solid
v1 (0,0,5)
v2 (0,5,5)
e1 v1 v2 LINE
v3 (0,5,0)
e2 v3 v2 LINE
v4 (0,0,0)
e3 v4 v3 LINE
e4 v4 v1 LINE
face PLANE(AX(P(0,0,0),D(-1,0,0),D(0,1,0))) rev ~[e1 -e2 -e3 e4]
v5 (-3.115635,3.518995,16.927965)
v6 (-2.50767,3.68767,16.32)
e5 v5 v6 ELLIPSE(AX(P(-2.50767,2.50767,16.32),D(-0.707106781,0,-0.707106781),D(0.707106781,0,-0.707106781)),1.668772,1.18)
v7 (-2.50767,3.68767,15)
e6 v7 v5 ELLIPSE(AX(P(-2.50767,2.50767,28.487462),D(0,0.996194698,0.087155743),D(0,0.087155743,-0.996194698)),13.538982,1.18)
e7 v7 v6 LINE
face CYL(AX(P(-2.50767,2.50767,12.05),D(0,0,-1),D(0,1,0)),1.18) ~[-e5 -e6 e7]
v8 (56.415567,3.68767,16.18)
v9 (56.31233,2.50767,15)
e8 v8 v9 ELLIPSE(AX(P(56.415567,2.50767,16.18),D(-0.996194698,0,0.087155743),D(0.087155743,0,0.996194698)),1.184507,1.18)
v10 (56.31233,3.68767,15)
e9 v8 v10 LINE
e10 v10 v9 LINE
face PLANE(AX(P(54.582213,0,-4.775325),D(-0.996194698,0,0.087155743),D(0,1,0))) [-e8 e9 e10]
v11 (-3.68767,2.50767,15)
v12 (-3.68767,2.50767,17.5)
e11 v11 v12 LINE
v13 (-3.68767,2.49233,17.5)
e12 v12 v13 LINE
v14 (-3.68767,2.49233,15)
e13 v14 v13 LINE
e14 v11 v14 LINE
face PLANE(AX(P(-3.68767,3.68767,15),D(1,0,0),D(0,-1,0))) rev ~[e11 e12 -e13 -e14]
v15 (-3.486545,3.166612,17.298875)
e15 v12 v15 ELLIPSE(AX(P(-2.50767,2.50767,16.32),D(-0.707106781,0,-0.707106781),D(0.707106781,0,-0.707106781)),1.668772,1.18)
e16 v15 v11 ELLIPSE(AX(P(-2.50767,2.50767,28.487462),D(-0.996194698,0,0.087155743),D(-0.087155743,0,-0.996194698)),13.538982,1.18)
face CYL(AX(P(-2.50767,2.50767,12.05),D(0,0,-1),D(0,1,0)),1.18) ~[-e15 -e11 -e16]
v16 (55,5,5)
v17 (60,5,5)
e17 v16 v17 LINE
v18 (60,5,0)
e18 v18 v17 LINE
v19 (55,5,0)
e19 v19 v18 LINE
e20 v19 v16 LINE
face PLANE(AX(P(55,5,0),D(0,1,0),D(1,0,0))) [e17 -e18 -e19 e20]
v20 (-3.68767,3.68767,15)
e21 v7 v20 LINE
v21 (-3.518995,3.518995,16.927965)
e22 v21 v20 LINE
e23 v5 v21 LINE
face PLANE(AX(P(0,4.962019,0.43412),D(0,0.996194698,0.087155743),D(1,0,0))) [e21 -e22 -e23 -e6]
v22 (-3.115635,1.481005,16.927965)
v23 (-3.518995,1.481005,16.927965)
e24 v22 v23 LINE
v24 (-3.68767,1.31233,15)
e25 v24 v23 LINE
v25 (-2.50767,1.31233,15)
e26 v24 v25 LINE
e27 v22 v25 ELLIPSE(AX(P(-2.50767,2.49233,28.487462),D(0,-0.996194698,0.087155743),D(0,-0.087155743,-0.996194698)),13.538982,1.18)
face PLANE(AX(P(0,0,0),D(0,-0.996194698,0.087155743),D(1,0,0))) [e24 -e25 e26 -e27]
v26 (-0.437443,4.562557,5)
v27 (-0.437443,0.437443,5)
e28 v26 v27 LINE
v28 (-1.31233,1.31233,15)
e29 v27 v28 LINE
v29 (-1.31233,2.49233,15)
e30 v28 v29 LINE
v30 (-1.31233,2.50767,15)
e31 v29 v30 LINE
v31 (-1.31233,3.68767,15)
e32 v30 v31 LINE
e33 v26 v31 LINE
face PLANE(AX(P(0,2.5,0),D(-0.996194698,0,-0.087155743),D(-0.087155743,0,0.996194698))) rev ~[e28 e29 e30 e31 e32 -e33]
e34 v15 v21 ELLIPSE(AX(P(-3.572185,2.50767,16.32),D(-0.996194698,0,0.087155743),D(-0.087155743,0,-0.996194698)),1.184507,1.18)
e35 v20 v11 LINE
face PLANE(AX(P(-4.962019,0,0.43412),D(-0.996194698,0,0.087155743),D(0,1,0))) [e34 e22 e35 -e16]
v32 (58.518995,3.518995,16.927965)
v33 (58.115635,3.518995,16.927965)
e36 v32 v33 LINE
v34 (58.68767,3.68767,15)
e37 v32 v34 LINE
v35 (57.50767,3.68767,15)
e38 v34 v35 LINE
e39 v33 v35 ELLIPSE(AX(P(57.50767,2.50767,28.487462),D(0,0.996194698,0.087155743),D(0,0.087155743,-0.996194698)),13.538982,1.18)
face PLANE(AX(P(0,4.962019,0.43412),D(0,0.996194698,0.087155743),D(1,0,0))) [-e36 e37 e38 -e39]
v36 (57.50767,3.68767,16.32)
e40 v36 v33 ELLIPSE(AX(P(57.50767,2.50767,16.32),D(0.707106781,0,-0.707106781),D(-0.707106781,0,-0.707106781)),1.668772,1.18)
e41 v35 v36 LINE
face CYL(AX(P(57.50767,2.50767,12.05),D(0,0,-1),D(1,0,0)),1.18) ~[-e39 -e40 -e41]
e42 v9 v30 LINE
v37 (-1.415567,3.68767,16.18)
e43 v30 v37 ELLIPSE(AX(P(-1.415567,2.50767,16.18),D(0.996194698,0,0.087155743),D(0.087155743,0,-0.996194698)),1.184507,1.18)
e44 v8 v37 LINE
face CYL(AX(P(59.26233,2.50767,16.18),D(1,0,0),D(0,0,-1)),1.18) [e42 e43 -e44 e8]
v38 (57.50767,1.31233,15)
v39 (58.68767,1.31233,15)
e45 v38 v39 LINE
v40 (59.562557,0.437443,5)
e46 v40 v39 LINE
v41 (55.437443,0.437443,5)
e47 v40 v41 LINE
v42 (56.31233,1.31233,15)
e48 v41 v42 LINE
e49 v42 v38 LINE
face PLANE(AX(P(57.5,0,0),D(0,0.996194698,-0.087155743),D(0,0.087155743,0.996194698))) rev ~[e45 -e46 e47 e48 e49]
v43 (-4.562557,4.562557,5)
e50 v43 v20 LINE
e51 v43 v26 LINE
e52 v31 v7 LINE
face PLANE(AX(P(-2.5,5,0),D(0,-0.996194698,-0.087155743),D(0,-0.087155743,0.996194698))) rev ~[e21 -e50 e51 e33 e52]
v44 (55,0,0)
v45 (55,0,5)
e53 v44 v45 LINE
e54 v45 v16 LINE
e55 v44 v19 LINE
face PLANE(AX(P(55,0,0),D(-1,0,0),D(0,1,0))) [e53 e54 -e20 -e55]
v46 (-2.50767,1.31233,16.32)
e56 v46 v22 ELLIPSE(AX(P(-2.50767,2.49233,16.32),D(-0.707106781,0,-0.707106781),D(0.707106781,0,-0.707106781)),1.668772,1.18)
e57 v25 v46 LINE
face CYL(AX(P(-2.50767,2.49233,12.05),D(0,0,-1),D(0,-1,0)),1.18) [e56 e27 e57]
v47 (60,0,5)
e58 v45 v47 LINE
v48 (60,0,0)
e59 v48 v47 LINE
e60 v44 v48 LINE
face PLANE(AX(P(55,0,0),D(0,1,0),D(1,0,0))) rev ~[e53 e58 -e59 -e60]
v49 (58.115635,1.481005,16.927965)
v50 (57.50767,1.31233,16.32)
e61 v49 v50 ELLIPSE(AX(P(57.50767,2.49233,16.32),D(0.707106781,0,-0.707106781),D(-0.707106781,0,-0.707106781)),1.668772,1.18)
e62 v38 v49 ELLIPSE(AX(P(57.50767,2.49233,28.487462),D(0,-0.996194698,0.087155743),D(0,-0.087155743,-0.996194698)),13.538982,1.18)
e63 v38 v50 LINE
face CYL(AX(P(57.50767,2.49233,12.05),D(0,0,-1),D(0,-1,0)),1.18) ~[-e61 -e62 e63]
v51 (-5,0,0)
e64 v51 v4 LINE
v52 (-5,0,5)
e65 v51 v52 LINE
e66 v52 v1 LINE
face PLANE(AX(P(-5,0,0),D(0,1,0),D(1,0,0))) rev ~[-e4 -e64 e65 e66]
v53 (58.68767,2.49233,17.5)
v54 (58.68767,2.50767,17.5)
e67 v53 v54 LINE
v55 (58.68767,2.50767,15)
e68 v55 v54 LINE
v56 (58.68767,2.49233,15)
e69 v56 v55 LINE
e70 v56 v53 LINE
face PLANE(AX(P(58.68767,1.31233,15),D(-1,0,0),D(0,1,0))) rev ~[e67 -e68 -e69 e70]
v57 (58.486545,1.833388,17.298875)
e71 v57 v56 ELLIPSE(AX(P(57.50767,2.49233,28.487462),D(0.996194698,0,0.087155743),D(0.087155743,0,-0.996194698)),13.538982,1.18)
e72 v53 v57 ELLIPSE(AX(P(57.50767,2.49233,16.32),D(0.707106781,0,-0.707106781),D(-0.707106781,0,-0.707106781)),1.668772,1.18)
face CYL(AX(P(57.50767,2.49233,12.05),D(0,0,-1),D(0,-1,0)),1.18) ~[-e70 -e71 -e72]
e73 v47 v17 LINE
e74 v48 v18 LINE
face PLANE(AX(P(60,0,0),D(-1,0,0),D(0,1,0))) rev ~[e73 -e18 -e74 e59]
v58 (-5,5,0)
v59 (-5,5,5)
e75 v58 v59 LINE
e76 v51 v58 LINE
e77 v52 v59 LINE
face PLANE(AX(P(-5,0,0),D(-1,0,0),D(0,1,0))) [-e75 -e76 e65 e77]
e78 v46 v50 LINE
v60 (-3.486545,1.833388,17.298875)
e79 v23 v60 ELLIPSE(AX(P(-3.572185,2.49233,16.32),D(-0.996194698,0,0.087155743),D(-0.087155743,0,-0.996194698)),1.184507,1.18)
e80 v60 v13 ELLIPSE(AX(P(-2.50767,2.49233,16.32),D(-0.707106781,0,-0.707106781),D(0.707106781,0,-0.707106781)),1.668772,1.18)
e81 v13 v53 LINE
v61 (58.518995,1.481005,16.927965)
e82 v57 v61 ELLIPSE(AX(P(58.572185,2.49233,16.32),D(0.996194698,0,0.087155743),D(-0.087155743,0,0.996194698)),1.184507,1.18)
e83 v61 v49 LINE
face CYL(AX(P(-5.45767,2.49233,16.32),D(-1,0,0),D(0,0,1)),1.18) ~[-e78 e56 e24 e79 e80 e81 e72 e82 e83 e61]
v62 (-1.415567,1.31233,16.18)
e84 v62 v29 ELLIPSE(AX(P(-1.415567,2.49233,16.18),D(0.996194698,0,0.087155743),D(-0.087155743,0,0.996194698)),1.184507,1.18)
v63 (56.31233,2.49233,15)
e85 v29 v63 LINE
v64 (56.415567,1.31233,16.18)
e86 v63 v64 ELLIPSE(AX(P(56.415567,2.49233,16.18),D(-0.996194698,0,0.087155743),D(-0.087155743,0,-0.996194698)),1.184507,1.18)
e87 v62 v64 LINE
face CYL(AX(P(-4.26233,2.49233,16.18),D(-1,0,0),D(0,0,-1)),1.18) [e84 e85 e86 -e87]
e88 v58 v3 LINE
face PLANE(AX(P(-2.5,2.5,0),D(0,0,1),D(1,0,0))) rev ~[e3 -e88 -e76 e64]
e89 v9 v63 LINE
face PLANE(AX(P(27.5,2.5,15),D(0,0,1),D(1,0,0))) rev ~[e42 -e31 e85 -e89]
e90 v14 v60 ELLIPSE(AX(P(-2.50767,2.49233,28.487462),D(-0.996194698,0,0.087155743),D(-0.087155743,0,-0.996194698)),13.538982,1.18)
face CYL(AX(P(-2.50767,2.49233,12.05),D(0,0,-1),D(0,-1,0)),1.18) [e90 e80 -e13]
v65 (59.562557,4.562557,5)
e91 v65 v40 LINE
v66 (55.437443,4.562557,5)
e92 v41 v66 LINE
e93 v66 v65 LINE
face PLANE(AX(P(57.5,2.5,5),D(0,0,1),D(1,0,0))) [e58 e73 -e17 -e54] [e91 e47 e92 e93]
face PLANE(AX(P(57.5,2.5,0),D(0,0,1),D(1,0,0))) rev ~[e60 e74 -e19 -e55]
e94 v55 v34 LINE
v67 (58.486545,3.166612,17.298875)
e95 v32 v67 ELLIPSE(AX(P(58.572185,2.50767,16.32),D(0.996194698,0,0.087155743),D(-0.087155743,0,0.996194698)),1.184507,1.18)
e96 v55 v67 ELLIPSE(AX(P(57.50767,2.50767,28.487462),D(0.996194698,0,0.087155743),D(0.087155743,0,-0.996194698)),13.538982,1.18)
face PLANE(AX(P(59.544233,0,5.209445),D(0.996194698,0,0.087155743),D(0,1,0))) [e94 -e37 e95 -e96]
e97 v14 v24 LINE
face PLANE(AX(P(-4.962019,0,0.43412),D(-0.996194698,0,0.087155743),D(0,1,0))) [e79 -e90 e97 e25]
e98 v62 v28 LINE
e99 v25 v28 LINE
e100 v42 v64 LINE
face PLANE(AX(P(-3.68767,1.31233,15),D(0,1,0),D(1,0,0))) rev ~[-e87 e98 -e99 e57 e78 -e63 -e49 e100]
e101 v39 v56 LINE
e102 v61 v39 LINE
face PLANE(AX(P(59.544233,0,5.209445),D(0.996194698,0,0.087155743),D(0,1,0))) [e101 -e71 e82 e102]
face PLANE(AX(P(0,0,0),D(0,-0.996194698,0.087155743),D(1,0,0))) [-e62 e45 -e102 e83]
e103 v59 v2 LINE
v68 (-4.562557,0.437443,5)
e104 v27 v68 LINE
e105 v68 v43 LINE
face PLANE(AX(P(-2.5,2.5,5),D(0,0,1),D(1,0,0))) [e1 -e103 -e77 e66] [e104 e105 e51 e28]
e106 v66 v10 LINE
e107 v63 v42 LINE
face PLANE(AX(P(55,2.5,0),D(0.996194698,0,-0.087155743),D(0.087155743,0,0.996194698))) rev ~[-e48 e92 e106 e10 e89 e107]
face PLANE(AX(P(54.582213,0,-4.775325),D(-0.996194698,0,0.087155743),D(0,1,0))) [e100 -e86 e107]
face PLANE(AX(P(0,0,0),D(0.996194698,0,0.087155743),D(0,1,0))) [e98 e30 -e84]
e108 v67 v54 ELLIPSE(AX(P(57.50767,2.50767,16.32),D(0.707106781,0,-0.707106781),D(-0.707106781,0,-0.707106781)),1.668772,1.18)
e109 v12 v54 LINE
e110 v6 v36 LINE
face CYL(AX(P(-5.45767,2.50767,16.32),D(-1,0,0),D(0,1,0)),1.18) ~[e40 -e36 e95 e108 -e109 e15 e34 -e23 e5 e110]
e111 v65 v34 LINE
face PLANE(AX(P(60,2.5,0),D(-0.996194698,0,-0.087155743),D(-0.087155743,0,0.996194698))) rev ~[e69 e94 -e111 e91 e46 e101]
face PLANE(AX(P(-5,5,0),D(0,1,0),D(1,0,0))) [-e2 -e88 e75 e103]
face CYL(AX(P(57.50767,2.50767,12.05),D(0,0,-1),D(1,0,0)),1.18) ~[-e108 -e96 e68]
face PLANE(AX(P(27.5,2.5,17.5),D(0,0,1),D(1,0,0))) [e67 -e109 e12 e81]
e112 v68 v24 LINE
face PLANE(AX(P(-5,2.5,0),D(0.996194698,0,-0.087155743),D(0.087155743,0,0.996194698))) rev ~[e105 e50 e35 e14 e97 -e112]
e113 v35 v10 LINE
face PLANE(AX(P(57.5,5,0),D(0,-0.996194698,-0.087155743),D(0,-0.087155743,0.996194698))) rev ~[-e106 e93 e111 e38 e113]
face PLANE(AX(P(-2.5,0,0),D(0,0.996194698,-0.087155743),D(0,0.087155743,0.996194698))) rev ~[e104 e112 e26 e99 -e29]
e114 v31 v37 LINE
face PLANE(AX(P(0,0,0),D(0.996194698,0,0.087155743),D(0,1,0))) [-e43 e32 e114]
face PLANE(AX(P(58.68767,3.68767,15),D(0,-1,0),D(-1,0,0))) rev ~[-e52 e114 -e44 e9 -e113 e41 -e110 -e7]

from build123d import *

# Parameters (mm, degrees)
F0_W         = 5
F0_H         = 5
F1_DEPTH     = 5
F2_DEPTH     = 15
F2_TAPER     = 5
F4_DEPTH     = 2.5
F5_T4_DEPTH  = 8.4
F5_T9_DEPTH  = 8.4
F5_T14_DEPTH = 8.4
F5_T19_DEPTH = 8.4
F5_T24_DEPTH = 8.4
F5_T29_DEPTH = 8.4
F5_T34_DEPTH = 8.4
F5_T39_DEPTH = 8.4
F6_T1_DEPTH  = 65.9153400942
F6_T6_DEPTH  = 63.5246599058
F6_T12_DEPTH = 63.5246599058


# Not quite as in the source:
# - a fillet or chamfer that OpenCascade refuses, or shapes differently, is made with other operations: its cross-section is extruded or revolved along the edge and cut away or added


with BuildPart() as f1:
    # F0 (on Top) → F1 (new body)
    with BuildSketch(Plane.XY):
        with Locations((-2.5, 2.5)):
            Rectangle(F0_W, F0_H)
    extrude(amount=F1_DEPTH)

    # F0 (on Top) → F2 (join)
    with BuildSketch(Plane.XY):
        with Locations((-2.5, 2.5)):
            Rectangle(F0_W, F0_H)
    extrude(amount=F2_DEPTH, taper=F2_TAPER)



with BuildPart() as f1b:
    # F0 (on Top) → F1, piece 2 (new body)
    with BuildSketch(Plane.XY):
        with Locations((57.5, 2.5)):
            Rectangle(F0_W, F0_H)
    extrude(amount=F1_DEPTH)

    # F0 (on Top) → F2, piece 2 (join)
    with BuildSketch(Plane.XY):
        with Locations((57.5, 2.5)):
            Rectangle(F0_W, F0_H)
    extrude(amount=F2_DEPTH, taper=F2_TAPER)


with BuildPart() as f1_1:
    add(f1.part)

    add(f1b.part)  # F4 merges F1b
    # F3 (on face) → F4 (join)
    with BuildSketch(Plane.XY.offset(15)):
        Polygon((-1.3123299529, 3.6876700471), (-3.6876700471, 3.6876700471), (-3.6876700471, 1.3123299529), (-1.3123299529, 1.3123299529), (56.3123299529, 1.3123299529), (58.6876700471, 1.3123299529), (58.6876700471, 3.6876700471), (56.3123299529, 3.6876700471), align=None)
    extrude(amount=F4_DEPTH)

    # F5: fillet of radius 1.18 on 4 edges, made by hand


with BuildPart() as f5_tool2:
    # F5_s3 → F5_t4 (new body)
    with BuildSketch(Plane.XY.offset(12.05)):
        with BuildLine():
            ThreePointArc((58.6876700471, 2.5076700471), (58.3420560489, 3.3420560489), (57.5076700471, 3.6876700471))
            Line((57.5076700471, 3.6876700471), (58.6876700471, 3.6876700471))
            Line((58.6876700471, 3.6876700471), (58.6876700471, 2.5076700471))
        make_face()
    extrude(amount=F5_T4_DEPTH)

    split(bisect_by=Plane(origin=(0, 4.9620193825, 0.4341204442), x_dir=(1, 0, 0), z_dir=(0, 0.9961946981, 0.0871557427)), keep=Keep.TOP)


with BuildPart() as f1_2:
    add(f1_1.part)

    # F5_t1: cut F5_tool2
    add(f5_tool2.part, mode=Mode.SUBTRACT)


with BuildPart() as f5_tool7:
    # F5_s8 → F5_t9 (new body)
    with BuildSketch(Plane.XY.offset(12.05)):
        with BuildLine():
            ThreePointArc((58.6876700471, 2.5076700471), (58.3420560489, 3.3420560489), (57.5076700471, 3.6876700471))
            Line((57.5076700471, 3.6876700471), (58.6876700471, 3.6876700471))
            Line((58.6876700471, 3.6876700471), (58.6876700471, 2.5076700471))
        make_face()
    extrude(amount=F5_T9_DEPTH)

    split(bisect_by=Plane(origin=(59.5442325904, 0, 5.20944533), x_dir=(0, 1, 0), z_dir=(0.9961946981, 0, 0.0871557427)), keep=Keep.TOP)


with BuildPart() as f1_3:
    add(f1_2.part)

    # F5_t6: cut F5_tool7
    add(f5_tool7.part, mode=Mode.SUBTRACT)


with BuildPart() as f5_tool12:
    # F5_s13 → F5_t14 (new body)
    with BuildSketch(Plane.XY.offset(12.05)):
        with BuildLine():
            ThreePointArc((57.5076700471, 1.3123299529), (58.3420560489, 1.6579439511), (58.6876700471, 2.4923299529))
            Line((58.6876700471, 2.4923299529), (58.6876700471, 1.3123299529))
            Line((58.6876700471, 1.3123299529), (57.5076700471, 1.3123299529))
        make_face()
    extrude(amount=F5_T14_DEPTH)

    split(bisect_by=Plane(origin=(59.5442325904, 0, 5.20944533), x_dir=(0, 1, 0), z_dir=(0.9961946981, 0, 0.0871557427)), keep=Keep.TOP)


with BuildPart() as f1_4:
    add(f1_3.part)

    # F5_t11: cut F5_tool12
    add(f5_tool12.part, mode=Mode.SUBTRACT)


with BuildPart() as f5_tool17:
    # F5_s18 → F5_t19 (new body)
    with BuildSketch(Plane.XY.offset(12.05)):
        with BuildLine():
            ThreePointArc((57.5076700471, 1.3123299529), (58.3420560489, 1.6579439511), (58.6876700471, 2.4923299529))
            Line((58.6876700471, 2.4923299529), (58.6876700471, 1.3123299529))
            Line((58.6876700471, 1.3123299529), (57.5076700471, 1.3123299529))
        make_face()
    extrude(amount=F5_T19_DEPTH)

    split(bisect_by=Plane(origin=(0, 0, 0), x_dir=(1, 0, 0), z_dir=(0, -0.9961946981, 0.0871557427)), keep=Keep.TOP)


with BuildPart() as f1_5:
    add(f1_4.part)

    # F5_t16: cut F5_tool17
    add(f5_tool17.part, mode=Mode.SUBTRACT)


with BuildPart() as f5_tool22:
    # F5_s23 → F5_t24 (new body)
    with BuildSketch(Plane.XY.offset(12.05)):
        with BuildLine():
            ThreePointArc((-2.5076700471, 3.6876700471), (-3.3420560489, 3.3420560489), (-3.6876700471, 2.5076700471))
            Line((-3.6876700471, 2.5076700471), (-3.6876700471, 3.6876700471))
            Line((-3.6876700471, 3.6876700471), (-2.5076700471, 3.6876700471))
        make_face()
    extrude(amount=F5_T24_DEPTH)

    split(bisect_by=Plane(origin=(-4.9620193825, 0, 0.4341204442), x_dir=(0, 1, 0), z_dir=(-0.9961946981, 0, 0.0871557427)), keep=Keep.TOP)


with BuildPart() as f1_6:
    add(f1_5.part)

    # F5_t21: cut F5_tool22
    add(f5_tool22.part, mode=Mode.SUBTRACT)


with BuildPart() as f5_tool27:
    # F5_s28 → F5_t29 (new body)
    with BuildSketch(Plane.XY.offset(12.05)):
        with BuildLine():
            ThreePointArc((-2.5076700471, 3.6876700471), (-3.3420560489, 3.3420560489), (-3.6876700471, 2.5076700471))
            Line((-3.6876700471, 2.5076700471), (-3.6876700471, 3.6876700471))
            Line((-3.6876700471, 3.6876700471), (-2.5076700471, 3.6876700471))
        make_face()
    extrude(amount=F5_T29_DEPTH)

    split(bisect_by=Plane(origin=(0, 4.9620193825, 0.4341204442), x_dir=(1, 0, 0), z_dir=(0, 0.9961946981, 0.0871557427)), keep=Keep.TOP)


with BuildPart() as f1_7:
    add(f1_6.part)

    # F5_t26: cut F5_tool27
    add(f5_tool27.part, mode=Mode.SUBTRACT)


with BuildPart() as f5_tool32:
    # F5_s33 → F5_t34 (new body)
    with BuildSketch(Plane.XY.offset(12.05)):
        with BuildLine():
            ThreePointArc((-2.5076700471, 1.3123299529), (-3.3420560489, 1.6579439511), (-3.6876700471, 2.4923299529))
            Line((-3.6876700471, 2.4923299529), (-3.6876700471, 1.3123299529))
            Line((-3.6876700471, 1.3123299529), (-2.5076700471, 1.3123299529))
        make_face()
    extrude(amount=F5_T34_DEPTH)

    split(bisect_by=Plane(origin=(-4.9620193825, 0, 0.4341204442), x_dir=(0, 1, 0), z_dir=(-0.9961946981, 0, 0.0871557427)), keep=Keep.TOP)


with BuildPart() as f1_8:
    add(f1_7.part)

    # F5_t31: cut F5_tool32
    add(f5_tool32.part, mode=Mode.SUBTRACT)


with BuildPart() as f5_tool37:
    # F5_s38 → F5_t39 (new body)
    with BuildSketch(Plane.XY.offset(12.05)):
        with BuildLine():
            ThreePointArc((-2.5076700471, 1.3123299529), (-3.3420560489, 1.6579439511), (-3.6876700471, 2.4923299529))
            Line((-3.6876700471, 2.4923299529), (-3.6876700471, 1.3123299529))
            Line((-3.6876700471, 1.3123299529), (-2.5076700471, 1.3123299529))
        make_face()
    extrude(amount=F5_T39_DEPTH)

    split(bisect_by=Plane(origin=(0, 0, 0), x_dir=(1, 0, 0), z_dir=(0, -0.9961946981, 0.0871557427)), keep=Keep.TOP)


with BuildPart() as f1_9:
    add(f1_8.part)

    # F5_t36: cut F5_tool37
    add(f5_tool37.part, mode=Mode.SUBTRACT)

    # F6: fillet of radius 1.18 on 8 edges, made by hand

    # F6_s2 → F6_t1 (cut)
    with BuildSketch(Plane.YZ.offset(-5.4576700471)):
        with BuildLine():
            ThreePointArc((3.6876700471, 16.32), (3.3420560489, 17.1543860018), (2.5076700471, 17.5))
            Line((2.5076700471, 17.5), (3.6876700471, 17.5))
            Line((3.6876700471, 17.5), (3.6876700471, 16.32))
        make_face()
        with BuildLine():
            ThreePointArc((2.4923299529, 17.5), (1.6579439511, 17.1543860018), (1.3123299529, 16.32))
            Line((1.3123299529, 16.32), (1.3123299529, 17.5))
            Line((1.3123299529, 17.5), (2.4923299529, 17.5))
        make_face()
    extrude(amount=F6_T1_DEPTH, mode=Mode.SUBTRACT)


with BuildPart() as f6_tool4:
    # F6_s5 → F6_t6 (new body)
    with BuildSketch(Plane.YZ.offset(59.2623299529)):
        with BuildLine():
            ThreePointArc((2.5076700471, 15), (3.3420560489, 15.3456139982), (3.6876700471, 16.18))
            Line((3.6876700471, 16.18), (3.6876700471, 15))
            Line((3.6876700471, 15), (2.5076700471, 15))
        make_face()
    extrude(amount=-F6_T6_DEPTH)

    split(bisect_by=Plane(origin=(54.5822132078, 0, -4.7753248858), x_dir=(0, 1, 0), z_dir=(-0.9961946981, 0, 0.0871557427)), keep=Keep.TOP)

    split(bisect_by=Plane(origin=(0, 0, 0), x_dir=(0, 1, 0), z_dir=(0.9961946981, 0, 0.0871557427)), keep=Keep.TOP)


with BuildPart() as f1_10:
    add(f1_9.part)

    # F6_t3: cut F6_tool4
    add(f6_tool4.part, mode=Mode.SUBTRACT)


with BuildPart() as f6_tool10:
    # F6_s11 → F6_t12 (new body)
    with BuildSketch(Plane.YZ.offset(-4.2623299529)):
        with BuildLine():
            ThreePointArc((2.4923299529, 15), (1.6579439511, 15.3456139982), (1.3123299529, 16.18))
            Line((1.3123299529, 16.18), (1.3123299529, 15))
            Line((1.3123299529, 15), (2.4923299529, 15))
        make_face()
    extrude(amount=F6_T12_DEPTH)

    split(bisect_by=Plane(origin=(54.5822132078, 0, -4.7753248858), x_dir=(0, 1, 0), z_dir=(-0.9961946981, 0, 0.0871557427)), keep=Keep.TOP)

    split(bisect_by=Plane(origin=(0, 0, 0), x_dir=(0, 1, 0), z_dir=(0.9961946981, 0, 0.0871557427)), keep=Keep.TOP)


with BuildPart() as f1_11:
    add(f1_10.part)

    # F6_t9: cut F6_tool10
    add(f6_tool10.part, mode=Mode.SUBTRACT)


solid = f1_11.part
